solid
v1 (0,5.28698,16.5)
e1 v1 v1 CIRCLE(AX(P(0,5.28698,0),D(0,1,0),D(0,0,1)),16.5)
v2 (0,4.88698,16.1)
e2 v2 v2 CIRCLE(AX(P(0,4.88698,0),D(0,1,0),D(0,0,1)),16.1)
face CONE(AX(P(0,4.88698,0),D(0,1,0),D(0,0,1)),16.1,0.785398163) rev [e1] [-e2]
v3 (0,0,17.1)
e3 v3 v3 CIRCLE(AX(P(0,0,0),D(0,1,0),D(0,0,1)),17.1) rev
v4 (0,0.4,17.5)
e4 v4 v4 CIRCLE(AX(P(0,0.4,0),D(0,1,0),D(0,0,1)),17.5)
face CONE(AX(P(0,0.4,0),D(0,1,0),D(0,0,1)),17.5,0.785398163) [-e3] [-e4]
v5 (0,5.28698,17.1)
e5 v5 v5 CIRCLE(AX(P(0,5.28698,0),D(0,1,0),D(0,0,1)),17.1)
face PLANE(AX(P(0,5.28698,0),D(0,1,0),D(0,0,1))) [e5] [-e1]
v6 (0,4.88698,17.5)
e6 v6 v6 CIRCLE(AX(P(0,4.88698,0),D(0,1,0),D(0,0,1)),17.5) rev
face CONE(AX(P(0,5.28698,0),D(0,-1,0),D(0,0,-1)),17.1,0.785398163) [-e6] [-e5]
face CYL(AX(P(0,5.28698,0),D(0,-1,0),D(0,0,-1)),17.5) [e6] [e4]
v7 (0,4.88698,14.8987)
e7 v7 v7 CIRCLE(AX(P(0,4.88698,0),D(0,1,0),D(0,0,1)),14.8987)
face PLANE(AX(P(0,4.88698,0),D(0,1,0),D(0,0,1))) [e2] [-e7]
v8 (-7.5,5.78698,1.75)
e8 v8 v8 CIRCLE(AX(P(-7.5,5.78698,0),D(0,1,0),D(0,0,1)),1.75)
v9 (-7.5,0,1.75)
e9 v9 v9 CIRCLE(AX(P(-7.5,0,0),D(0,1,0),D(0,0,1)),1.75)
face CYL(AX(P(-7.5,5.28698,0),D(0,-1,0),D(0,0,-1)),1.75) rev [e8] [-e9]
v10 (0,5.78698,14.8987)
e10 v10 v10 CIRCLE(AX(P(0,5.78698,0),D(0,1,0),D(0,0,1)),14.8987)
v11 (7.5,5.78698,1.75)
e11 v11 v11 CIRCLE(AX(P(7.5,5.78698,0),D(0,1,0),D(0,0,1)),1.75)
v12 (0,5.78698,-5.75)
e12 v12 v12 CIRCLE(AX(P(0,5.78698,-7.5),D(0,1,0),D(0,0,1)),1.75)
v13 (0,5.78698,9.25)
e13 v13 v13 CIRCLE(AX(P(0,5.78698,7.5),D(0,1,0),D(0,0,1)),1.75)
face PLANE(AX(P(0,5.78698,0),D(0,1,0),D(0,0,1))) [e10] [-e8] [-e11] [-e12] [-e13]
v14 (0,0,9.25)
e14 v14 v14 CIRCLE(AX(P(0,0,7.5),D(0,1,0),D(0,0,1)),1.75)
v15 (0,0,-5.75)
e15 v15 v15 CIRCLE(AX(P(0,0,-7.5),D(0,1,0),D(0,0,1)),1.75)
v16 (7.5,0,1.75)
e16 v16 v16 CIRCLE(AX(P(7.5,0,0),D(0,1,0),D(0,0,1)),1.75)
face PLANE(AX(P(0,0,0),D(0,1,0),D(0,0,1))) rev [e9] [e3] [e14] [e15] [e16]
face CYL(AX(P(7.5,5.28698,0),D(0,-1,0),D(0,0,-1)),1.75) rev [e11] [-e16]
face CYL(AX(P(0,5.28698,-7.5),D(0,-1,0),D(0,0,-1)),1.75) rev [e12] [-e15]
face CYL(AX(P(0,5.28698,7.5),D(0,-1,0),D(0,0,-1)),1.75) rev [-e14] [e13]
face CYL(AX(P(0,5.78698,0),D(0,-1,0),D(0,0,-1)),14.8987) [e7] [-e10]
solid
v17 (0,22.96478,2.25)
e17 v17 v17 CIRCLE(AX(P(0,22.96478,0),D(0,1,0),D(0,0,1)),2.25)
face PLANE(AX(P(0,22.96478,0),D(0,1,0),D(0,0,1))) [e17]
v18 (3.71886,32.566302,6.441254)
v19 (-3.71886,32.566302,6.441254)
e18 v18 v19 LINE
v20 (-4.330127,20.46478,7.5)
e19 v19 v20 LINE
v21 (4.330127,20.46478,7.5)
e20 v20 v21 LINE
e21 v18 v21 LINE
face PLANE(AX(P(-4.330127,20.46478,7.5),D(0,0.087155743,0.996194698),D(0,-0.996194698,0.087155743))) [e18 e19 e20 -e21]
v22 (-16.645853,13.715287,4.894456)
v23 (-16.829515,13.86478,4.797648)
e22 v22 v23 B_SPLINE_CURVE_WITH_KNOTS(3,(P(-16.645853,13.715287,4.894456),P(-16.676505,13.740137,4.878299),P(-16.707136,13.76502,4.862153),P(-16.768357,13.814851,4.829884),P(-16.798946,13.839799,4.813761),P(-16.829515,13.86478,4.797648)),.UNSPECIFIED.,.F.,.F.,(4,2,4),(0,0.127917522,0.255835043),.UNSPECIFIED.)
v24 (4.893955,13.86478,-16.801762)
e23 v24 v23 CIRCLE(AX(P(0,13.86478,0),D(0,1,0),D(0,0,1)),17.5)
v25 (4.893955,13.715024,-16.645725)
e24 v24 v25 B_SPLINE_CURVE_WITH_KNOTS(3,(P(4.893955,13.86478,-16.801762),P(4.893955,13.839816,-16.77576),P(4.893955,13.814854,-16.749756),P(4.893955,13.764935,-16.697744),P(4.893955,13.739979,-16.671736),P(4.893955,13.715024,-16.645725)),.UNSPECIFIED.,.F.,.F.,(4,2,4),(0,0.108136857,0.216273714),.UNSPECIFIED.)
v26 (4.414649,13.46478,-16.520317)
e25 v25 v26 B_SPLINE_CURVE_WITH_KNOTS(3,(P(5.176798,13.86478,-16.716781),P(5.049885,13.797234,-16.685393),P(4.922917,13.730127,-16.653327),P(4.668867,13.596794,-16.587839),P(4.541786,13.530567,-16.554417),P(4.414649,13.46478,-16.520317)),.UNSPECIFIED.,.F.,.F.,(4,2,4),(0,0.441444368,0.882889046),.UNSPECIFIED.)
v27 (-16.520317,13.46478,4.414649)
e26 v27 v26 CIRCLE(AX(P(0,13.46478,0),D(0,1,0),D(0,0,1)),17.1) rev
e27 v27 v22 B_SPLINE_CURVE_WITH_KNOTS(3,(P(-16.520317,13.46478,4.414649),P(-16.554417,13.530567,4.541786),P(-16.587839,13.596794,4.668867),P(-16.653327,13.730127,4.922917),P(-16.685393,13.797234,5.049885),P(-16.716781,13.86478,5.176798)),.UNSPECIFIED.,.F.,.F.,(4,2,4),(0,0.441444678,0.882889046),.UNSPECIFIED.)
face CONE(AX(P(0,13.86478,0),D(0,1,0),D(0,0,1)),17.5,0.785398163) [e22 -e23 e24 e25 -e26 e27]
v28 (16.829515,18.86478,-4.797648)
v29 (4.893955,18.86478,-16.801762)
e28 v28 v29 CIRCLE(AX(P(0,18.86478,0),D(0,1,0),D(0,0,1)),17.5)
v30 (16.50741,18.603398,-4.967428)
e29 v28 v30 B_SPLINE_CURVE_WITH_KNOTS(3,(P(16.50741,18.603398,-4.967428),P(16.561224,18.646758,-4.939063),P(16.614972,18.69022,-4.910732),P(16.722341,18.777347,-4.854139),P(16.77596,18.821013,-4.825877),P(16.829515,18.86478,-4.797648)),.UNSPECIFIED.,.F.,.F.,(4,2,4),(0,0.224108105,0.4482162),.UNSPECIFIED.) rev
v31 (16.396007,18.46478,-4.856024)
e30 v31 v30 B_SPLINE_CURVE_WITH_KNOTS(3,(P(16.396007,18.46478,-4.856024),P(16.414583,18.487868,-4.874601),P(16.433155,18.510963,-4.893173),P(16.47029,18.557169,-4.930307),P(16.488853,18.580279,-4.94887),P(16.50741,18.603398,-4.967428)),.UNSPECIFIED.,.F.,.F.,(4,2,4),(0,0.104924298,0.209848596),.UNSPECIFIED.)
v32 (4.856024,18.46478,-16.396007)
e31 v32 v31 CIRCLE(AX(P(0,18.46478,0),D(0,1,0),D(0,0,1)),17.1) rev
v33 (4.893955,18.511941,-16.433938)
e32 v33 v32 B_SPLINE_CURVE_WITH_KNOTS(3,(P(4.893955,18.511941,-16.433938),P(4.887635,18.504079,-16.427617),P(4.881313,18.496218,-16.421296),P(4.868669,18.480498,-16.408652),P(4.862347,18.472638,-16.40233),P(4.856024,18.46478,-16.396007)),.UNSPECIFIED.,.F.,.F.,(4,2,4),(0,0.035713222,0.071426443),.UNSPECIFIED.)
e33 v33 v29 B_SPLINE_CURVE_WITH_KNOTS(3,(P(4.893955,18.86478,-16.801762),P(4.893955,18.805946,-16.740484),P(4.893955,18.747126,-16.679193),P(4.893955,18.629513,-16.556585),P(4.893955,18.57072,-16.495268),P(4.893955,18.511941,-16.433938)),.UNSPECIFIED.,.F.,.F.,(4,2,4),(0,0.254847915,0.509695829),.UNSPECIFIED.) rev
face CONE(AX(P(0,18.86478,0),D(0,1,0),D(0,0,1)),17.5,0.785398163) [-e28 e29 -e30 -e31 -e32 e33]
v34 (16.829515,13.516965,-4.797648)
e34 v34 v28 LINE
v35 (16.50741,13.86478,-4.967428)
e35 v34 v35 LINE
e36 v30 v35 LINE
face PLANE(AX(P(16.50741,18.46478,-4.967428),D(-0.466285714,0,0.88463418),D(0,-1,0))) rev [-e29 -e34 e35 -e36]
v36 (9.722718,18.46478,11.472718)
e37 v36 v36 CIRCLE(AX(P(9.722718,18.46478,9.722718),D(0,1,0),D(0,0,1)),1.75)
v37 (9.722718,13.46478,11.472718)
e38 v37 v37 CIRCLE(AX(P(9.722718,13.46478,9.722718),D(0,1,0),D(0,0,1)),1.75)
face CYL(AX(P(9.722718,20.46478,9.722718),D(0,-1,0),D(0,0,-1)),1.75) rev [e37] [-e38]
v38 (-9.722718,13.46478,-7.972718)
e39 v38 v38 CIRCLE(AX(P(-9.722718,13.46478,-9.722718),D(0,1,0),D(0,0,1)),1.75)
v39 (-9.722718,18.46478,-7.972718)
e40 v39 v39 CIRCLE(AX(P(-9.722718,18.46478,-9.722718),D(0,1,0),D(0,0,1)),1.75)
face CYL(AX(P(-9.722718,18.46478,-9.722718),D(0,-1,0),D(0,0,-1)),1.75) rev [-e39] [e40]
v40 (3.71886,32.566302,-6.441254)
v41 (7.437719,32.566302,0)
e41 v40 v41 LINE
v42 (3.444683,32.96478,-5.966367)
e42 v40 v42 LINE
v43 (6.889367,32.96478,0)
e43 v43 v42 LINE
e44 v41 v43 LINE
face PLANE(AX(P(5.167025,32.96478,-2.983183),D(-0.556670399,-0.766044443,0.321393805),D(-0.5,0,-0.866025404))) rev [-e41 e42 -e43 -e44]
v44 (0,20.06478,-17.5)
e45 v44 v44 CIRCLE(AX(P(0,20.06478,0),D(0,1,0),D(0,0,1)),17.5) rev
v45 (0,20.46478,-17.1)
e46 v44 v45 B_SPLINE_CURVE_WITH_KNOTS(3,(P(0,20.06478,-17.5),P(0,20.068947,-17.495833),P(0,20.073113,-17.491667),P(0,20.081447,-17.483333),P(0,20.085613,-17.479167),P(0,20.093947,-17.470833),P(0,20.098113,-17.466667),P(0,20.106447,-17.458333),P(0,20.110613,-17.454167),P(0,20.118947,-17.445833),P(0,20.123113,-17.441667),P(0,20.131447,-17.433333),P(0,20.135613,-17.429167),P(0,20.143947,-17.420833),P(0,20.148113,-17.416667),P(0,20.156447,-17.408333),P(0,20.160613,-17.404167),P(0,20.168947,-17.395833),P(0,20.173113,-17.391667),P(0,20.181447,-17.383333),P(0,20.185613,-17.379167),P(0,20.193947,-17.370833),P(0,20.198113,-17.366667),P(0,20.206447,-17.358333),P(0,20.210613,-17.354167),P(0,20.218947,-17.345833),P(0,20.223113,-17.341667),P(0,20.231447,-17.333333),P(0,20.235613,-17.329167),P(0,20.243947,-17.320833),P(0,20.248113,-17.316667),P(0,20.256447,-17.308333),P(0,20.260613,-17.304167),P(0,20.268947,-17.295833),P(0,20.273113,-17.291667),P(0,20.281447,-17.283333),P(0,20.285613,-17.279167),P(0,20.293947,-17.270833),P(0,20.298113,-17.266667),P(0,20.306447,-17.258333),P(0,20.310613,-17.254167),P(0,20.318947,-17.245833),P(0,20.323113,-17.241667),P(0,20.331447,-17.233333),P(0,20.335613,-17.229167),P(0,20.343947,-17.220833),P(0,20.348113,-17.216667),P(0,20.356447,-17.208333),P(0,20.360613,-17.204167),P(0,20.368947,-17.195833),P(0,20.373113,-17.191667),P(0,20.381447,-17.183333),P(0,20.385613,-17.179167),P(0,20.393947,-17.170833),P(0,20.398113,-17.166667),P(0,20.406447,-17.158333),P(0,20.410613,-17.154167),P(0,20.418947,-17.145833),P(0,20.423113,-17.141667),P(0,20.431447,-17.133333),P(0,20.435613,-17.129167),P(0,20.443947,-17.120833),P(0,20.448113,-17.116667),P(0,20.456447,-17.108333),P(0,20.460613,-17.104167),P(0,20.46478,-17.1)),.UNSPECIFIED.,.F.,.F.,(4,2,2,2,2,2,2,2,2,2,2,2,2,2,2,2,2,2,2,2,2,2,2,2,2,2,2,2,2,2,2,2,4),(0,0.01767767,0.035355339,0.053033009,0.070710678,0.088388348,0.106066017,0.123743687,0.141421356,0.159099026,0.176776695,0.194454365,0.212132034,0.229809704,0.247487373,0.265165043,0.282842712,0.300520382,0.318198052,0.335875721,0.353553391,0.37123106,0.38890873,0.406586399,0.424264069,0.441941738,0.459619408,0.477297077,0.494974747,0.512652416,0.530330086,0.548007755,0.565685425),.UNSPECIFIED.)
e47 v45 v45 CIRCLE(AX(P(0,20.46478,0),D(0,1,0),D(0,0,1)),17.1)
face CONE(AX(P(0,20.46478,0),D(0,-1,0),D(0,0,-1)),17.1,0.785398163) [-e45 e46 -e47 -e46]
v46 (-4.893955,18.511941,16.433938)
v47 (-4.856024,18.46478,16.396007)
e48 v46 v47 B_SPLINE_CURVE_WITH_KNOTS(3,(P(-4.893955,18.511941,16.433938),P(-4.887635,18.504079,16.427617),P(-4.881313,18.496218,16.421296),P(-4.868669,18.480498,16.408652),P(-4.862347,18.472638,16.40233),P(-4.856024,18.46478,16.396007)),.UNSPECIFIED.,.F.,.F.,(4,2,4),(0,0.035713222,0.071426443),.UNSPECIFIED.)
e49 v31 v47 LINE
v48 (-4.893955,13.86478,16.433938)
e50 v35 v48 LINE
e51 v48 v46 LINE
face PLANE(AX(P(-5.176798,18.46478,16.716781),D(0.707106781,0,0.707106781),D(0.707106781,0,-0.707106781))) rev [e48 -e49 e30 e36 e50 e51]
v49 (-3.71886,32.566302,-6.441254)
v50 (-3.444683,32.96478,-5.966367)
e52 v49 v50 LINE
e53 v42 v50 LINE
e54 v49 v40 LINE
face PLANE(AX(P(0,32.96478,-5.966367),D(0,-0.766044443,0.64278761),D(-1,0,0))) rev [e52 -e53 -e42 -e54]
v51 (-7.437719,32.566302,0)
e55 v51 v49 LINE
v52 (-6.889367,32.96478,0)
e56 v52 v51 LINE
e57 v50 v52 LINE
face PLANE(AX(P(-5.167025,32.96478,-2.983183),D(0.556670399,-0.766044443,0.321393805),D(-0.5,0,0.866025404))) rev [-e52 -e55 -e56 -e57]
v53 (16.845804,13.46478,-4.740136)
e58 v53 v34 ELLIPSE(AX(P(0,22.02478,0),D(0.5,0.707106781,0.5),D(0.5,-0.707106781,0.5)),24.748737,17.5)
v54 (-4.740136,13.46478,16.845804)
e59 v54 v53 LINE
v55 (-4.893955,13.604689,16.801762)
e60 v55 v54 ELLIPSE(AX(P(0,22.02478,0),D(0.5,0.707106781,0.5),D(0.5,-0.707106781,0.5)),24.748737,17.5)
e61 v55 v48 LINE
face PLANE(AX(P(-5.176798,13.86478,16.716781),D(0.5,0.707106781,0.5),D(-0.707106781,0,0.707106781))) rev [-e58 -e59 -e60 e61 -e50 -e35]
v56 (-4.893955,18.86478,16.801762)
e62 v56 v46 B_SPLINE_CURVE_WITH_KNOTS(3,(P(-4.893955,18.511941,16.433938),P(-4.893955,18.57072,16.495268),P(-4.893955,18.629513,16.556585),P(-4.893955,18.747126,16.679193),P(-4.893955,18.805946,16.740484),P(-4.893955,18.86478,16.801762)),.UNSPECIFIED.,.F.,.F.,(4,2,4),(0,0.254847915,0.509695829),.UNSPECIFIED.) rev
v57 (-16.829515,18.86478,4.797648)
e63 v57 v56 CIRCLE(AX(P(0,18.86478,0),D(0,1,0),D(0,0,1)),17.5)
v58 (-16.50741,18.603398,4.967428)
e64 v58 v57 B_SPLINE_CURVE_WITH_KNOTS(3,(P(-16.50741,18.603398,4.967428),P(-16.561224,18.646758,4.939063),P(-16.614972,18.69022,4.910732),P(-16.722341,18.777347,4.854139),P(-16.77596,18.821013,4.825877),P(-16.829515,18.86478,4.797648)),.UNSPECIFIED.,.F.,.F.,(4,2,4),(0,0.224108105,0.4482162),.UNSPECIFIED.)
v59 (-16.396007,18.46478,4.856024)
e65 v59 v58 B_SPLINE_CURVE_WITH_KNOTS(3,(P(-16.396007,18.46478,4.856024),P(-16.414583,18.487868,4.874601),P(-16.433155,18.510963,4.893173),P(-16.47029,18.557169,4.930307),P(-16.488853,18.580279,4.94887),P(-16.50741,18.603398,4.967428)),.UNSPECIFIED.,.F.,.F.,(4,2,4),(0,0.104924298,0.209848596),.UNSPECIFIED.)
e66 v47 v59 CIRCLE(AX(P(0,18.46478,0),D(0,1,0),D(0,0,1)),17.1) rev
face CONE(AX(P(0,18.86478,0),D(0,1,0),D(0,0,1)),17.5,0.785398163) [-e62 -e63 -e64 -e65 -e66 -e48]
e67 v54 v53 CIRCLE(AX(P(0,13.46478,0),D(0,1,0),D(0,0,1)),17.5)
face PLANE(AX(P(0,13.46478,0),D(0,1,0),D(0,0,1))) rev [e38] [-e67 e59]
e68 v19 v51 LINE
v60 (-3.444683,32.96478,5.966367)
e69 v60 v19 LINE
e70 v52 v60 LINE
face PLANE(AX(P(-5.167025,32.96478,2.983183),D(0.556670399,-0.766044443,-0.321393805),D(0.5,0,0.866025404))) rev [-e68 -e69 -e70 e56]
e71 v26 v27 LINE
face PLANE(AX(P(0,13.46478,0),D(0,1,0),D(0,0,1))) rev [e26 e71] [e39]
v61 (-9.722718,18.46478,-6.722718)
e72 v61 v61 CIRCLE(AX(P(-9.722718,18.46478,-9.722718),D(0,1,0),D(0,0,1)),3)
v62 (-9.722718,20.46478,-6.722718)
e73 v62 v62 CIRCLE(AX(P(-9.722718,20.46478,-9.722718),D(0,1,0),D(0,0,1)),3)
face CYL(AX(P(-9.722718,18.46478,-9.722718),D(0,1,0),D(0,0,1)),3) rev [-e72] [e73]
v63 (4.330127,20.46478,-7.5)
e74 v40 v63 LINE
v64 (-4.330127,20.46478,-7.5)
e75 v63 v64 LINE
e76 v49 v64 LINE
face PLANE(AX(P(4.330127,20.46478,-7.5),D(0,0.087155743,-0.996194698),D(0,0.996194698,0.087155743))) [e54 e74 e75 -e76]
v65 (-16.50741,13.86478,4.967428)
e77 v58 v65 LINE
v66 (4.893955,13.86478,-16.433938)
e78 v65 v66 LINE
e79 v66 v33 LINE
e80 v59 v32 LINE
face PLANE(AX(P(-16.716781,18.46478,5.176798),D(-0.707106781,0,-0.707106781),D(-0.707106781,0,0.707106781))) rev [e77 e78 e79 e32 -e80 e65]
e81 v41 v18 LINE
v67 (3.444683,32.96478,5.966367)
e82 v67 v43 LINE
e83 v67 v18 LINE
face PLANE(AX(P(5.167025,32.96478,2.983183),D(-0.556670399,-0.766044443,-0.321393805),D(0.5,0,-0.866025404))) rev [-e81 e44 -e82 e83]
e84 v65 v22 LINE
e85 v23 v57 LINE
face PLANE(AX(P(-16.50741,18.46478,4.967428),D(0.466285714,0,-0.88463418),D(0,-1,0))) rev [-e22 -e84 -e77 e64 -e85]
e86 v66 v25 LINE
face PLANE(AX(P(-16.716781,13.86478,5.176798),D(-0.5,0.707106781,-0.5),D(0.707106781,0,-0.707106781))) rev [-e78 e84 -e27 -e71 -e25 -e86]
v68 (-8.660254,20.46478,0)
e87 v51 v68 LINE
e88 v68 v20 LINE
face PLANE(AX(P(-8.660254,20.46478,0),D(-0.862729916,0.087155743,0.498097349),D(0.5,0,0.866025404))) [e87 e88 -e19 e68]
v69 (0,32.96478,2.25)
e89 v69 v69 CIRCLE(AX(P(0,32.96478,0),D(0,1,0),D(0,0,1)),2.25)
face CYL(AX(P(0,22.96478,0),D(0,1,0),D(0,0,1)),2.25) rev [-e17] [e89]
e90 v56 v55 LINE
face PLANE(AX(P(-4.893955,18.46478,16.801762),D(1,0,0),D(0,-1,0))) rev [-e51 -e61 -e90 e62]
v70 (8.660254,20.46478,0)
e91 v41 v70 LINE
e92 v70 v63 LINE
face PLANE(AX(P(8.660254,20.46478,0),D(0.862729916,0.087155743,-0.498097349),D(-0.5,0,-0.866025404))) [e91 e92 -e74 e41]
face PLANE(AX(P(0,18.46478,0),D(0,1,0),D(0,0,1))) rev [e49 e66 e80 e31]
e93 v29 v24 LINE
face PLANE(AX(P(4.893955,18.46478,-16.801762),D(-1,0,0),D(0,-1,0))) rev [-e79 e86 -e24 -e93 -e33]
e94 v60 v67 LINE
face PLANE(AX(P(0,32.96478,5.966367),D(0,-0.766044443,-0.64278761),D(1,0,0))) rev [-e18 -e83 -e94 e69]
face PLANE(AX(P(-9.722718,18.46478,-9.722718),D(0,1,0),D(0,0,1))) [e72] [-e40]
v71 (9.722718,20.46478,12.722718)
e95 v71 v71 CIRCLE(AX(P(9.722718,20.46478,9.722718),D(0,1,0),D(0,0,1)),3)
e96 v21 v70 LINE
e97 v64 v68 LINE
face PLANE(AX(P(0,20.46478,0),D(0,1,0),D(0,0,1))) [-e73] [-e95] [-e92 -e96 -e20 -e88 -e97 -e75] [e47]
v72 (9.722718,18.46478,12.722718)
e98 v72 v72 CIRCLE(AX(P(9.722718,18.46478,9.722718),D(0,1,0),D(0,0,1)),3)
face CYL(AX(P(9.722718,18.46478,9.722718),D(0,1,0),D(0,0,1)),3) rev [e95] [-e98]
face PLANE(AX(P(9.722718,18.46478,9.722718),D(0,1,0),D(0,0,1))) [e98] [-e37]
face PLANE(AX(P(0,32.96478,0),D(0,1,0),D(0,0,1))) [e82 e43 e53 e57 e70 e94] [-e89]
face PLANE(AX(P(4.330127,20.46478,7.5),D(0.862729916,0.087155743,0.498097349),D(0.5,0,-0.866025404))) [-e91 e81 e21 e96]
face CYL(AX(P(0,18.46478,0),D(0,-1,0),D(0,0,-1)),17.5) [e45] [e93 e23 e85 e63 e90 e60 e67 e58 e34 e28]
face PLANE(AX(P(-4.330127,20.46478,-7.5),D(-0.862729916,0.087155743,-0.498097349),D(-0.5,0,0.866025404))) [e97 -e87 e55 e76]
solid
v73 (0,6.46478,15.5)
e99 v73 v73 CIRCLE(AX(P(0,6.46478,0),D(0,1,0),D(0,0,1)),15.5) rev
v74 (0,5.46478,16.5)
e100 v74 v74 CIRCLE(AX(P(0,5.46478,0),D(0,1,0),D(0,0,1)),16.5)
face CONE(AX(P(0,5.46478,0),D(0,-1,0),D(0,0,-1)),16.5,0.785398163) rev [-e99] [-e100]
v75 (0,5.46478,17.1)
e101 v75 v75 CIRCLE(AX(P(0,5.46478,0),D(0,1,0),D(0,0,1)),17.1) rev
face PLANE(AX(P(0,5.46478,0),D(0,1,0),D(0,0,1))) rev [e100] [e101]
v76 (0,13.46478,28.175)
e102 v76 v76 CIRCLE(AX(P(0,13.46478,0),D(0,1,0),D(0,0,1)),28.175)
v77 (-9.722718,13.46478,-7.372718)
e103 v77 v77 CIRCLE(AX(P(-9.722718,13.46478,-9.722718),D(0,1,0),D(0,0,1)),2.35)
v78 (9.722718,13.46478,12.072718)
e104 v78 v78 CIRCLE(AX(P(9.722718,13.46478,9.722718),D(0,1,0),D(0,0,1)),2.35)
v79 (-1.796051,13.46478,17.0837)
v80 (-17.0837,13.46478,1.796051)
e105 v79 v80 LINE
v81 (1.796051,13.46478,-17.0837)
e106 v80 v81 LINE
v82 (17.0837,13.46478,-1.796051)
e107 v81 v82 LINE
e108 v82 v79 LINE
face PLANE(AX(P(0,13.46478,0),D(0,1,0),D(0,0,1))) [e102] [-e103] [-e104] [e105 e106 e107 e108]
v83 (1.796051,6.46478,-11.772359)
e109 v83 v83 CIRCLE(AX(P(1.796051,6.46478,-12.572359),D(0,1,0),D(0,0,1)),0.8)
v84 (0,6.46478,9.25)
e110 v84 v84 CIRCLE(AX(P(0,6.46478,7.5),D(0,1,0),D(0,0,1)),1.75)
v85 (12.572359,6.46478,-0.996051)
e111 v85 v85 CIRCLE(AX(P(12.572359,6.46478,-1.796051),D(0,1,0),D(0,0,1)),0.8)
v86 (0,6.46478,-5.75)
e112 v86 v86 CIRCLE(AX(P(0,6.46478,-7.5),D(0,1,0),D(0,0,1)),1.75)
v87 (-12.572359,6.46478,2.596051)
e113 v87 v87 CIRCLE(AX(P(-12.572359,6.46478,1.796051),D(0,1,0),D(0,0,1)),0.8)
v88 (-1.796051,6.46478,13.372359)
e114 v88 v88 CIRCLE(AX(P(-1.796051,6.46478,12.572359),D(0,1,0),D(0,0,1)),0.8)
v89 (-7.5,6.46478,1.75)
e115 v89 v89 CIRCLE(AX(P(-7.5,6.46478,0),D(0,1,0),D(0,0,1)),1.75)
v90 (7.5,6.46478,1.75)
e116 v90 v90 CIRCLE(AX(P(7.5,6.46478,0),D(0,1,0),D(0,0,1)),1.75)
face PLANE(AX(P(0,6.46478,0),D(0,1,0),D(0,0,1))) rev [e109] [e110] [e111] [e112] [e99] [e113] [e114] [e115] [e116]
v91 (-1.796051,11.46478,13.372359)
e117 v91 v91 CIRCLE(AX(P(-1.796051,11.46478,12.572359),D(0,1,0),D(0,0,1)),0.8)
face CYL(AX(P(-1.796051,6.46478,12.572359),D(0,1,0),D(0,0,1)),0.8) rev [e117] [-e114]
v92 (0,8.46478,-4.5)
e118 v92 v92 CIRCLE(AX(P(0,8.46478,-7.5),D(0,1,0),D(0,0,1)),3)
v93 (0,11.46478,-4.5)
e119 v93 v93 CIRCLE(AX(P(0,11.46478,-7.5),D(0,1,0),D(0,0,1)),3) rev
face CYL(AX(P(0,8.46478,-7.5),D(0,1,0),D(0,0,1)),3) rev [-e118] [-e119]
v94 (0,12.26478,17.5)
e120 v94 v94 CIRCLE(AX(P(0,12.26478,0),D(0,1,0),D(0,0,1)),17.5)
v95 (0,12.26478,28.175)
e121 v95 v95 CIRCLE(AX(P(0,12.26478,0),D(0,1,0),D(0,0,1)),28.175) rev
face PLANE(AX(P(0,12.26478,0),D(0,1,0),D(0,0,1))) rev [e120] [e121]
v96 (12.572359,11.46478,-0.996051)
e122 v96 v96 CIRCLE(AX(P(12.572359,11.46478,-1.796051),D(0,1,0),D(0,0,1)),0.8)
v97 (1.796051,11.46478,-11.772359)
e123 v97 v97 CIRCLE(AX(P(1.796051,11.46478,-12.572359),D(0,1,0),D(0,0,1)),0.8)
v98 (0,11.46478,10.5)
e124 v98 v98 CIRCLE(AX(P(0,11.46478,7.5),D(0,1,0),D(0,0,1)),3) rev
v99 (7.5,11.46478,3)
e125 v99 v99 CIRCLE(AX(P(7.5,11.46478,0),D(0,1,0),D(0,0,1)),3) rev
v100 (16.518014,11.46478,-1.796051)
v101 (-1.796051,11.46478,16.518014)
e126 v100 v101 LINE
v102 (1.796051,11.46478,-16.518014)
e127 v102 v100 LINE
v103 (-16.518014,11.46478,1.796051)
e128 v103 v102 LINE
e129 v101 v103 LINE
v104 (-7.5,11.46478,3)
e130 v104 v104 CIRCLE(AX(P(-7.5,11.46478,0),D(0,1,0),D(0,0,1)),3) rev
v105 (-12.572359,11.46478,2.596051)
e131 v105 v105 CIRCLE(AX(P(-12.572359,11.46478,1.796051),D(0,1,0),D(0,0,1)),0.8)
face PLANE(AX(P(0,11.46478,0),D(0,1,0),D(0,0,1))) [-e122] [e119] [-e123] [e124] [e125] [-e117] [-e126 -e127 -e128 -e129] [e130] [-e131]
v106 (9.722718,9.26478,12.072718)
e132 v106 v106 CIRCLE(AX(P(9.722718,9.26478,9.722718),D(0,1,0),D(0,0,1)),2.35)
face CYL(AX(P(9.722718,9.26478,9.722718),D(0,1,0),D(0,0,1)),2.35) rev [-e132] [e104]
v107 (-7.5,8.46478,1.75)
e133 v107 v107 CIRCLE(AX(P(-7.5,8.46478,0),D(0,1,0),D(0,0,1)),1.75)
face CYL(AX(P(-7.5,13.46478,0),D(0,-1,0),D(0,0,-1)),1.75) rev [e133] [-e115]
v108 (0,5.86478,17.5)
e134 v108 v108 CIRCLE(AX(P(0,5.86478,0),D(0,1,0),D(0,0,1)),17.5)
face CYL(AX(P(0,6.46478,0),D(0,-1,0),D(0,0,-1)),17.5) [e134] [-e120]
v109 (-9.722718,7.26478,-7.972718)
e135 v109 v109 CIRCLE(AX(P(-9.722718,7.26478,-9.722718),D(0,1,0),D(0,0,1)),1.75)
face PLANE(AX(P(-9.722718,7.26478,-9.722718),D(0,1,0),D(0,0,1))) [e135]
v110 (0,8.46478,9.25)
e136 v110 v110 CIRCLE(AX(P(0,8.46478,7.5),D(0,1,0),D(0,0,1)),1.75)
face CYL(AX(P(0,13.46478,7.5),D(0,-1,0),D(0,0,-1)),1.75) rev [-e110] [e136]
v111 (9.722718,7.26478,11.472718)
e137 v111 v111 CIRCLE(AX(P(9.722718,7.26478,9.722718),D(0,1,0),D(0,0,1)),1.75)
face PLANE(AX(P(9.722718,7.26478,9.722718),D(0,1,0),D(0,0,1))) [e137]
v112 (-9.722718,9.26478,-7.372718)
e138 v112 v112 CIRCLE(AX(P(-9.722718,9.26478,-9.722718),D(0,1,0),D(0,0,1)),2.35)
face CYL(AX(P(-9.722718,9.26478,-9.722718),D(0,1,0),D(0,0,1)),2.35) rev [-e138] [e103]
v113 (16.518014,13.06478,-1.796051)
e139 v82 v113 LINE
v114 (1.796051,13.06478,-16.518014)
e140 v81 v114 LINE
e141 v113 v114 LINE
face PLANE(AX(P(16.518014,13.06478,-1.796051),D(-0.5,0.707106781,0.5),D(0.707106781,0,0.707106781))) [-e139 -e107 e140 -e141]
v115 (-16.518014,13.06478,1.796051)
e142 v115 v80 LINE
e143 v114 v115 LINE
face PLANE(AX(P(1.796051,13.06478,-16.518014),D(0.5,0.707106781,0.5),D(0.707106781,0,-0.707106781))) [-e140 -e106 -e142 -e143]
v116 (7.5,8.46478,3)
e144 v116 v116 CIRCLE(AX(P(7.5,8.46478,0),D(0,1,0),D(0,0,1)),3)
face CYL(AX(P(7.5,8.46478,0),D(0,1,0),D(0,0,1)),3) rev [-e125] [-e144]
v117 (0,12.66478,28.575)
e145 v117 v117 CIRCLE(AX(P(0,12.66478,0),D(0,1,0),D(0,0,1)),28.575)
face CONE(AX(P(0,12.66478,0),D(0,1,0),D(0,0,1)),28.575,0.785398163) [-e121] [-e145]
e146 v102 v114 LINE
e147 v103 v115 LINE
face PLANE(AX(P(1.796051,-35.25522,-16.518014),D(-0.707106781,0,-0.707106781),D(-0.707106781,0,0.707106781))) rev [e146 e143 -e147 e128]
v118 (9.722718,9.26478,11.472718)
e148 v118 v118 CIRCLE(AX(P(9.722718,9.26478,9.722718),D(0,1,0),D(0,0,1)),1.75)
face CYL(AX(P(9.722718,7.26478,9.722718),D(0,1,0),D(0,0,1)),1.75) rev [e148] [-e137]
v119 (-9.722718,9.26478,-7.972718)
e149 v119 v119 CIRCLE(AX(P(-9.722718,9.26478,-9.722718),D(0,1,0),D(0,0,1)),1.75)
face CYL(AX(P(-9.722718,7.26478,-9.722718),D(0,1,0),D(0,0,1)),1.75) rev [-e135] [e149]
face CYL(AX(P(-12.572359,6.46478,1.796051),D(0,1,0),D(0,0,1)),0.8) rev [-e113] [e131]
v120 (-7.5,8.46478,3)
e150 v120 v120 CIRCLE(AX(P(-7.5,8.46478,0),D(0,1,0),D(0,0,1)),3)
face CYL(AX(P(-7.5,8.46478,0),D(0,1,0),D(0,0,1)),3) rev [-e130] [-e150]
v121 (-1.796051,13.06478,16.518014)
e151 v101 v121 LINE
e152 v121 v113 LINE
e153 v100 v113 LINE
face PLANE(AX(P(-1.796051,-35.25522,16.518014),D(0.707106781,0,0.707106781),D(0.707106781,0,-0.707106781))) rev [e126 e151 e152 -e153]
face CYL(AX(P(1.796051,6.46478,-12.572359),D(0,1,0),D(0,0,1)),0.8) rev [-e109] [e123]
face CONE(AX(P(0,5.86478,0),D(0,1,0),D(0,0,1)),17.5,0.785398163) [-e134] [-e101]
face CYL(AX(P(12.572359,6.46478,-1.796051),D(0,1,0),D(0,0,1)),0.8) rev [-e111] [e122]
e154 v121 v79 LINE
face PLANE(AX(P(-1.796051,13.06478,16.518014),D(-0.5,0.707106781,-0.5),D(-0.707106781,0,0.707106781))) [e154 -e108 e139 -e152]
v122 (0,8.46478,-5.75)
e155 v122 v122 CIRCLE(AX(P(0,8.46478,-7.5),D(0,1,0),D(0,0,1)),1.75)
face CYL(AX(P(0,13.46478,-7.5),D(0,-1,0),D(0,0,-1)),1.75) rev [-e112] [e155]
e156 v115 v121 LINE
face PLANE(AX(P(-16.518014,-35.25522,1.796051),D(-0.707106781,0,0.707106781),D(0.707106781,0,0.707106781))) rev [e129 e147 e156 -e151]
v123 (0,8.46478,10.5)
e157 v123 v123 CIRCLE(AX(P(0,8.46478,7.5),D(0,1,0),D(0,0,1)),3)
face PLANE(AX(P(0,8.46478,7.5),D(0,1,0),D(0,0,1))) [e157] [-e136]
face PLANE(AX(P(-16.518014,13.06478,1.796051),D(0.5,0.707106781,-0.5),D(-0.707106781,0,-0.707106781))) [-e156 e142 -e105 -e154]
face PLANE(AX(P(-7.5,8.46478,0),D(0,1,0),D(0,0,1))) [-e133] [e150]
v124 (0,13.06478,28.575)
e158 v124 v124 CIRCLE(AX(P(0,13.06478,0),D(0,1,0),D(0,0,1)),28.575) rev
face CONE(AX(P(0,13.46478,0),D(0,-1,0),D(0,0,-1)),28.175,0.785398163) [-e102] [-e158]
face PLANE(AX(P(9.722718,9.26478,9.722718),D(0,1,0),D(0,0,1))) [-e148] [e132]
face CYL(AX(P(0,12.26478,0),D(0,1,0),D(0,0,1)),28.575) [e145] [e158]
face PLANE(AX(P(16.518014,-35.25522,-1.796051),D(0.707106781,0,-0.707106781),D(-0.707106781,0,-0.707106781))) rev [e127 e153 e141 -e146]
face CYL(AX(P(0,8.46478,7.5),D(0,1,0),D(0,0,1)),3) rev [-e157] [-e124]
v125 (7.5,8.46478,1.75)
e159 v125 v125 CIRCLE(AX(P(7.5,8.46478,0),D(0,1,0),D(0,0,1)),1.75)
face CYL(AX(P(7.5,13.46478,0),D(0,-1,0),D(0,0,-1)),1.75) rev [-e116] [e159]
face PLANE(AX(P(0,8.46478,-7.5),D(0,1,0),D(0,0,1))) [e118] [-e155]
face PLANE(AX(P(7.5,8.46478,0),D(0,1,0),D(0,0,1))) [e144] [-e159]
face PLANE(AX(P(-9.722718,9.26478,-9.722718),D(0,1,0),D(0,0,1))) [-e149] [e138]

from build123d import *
from OCP.BRepFilletAPI import BRepFilletAPI_MakeChamfer

# Parameters (mm, degrees)
SKETCH1_R                                      = 17.5
SKETCH1_R_2                                    = 1.75
MAIN_BOSS_DEPTH                                = 5.28698
SKETCH3_R                                      = 14.8987
SKETCH3_R_2                                    = 1.75
CODEWHEEL_CENTER_BOSS_DEPTH                    = 0.5
CODEWHEEL_START                                = -0.4
SKETCH4_R                                      = 16.5
SKETCH4_R_2                                    = 14.8987
CODEWHEEL_RELIEF_CUT_DEPTH                     = 0.4
CODEWHEEL_RELIEF_CHAMFER_SIZE                  = 0.4
SKETCH6_R                                      = 17.5
SKETCH6_R_2                                    = 16.5
CODEWHEEL_TOP_BOSS_DEPTH                       = 1
SKETCH7_R                                      = 17.5
SKETCH7_R_2                                    = 1.75
SECONDARY_BOSS_DEPTH                           = 7
CODEWHEEL_RELIEF_CHAMFER_2_SIZE                = 1
SKETCH8_R                                      = 3
MOTOR_BOLT_COUNTERSINKS_DEPTH                  = 5
EDGE_CHAMFERS_1_SIZE                           = 0.4
EDGE_CHAMFERS_2_SIZE                           = 0.4
ACCELEROMETER_NOTCH_DEPTH                      = 2
SKETCH13_R                                     = 2.35
ACCELEROMETER_LAYER_HEAT_SET_INSERT_HOLE_DEPTH = 4.2
SKETCH14_R                                     = 1.75
ACCELEROMETER_LAYER_BOLT_THROUGH_HOLES_DEPTH   = 2
SKETCH15_R                                     = 1.75
ACCELEROMETER_COVER_DEPTH                      = 5
ACCELEROMETER_COVER_2_DEPTH                    = 5
SKETCH17_R                                     = 17.5
SKETCH17_R_2                                   = 1.75
ACCELEROMETER_COVER_BOSS_DEPTH                 = 2
SKETCH19_R                                     = 3
ACCLEROMETER_COVER_COUNTERSINKS_DEPTH          = 2
EDGE_CHAMFERS_3_SIZE                           = 0.4
OUTPUT_CONE_DEPTH                              = 12.5
OUTPUT_CONE_TAPER                              = 5
CHAMFER1_SIZE                                  = 0.4
CHAMFER1_SIZE2                                 = 0.440025147
SKETCH20_R                                     = 2.25
CUT_EXTRUDE1_DEPTH                             = 10
SKETCH21_R                                     = 0.8
CUT_EXTRUDE2_DEPTH                             = 5
CUT_EXTRUDE3_DEPTH                             = 2
SKETCH23_R                                     = 28.575
SKETCH23_R_2                                   = 17.1
BOSS_EXTRUDE1_DEPTH                            = 1.2
CHAMFER2_SIZE                                  = 0.4
CHAMFER3_SIZE                                  = 0.4
CHAMFER3_SIZE_2                                = 0.296094537


# Some blends are built 0.0001 mm under size
with BuildPart() as part:
    # Sketch1 → Main Boss (new body)
    with BuildSketch(Plane(origin=(0, 0, 0), x_dir=(1, 0, 0), z_dir=(0, 1, 0))):
        with Locations(Location((0, 0, 0), (0, 0, 270))):
            Circle(SKETCH1_R)
        with Locations(Location((7.5, 0, 0), (0, 0, 270))):
            Circle(SKETCH1_R_2, mode=Mode.SUBTRACT)
        with Locations(Location((0, 7.5, 0), (0, 0, 270))):
            Circle(SKETCH1_R_2, mode=Mode.SUBTRACT)
        with Locations(Location((-7.5, 0, 0), (0, 0, 270))):
            Circle(SKETCH1_R_2, mode=Mode.SUBTRACT)
        with Locations(Location((0, -7.5, 0), (0, 0, 270))):
            Circle(SKETCH1_R_2, mode=Mode.SUBTRACT)
    extrude(amount=MAIN_BOSS_DEPTH)

    # Sketch3 → Codewheel Center Boss (add)
    with BuildSketch(Plane(origin=(0, 5.28698, 0), x_dir=(1, 0, 0), z_dir=(0, 1, 0))):
        with Locations(Location((0, 0, 0), (0, 0, 270))):
            Circle(SKETCH3_R)
        with Locations(Location((-7.5, 0, 0), (0, 0, 270))):
            Circle(SKETCH3_R_2, mode=Mode.SUBTRACT)
        with Locations(Location((0, -7.5, 0), (0, 0, 270))):
            Circle(SKETCH3_R_2, mode=Mode.SUBTRACT)
        with Locations(Location((7.5, 0, 0), (0, 0, 270))):
            Circle(SKETCH3_R_2, mode=Mode.SUBTRACT)
        with Locations(Location((0, 7.5, 0), (0, 0, 270))):
            Circle(SKETCH3_R_2, mode=Mode.SUBTRACT)
    extrude(amount=CODEWHEEL_CENTER_BOSS_DEPTH)

    # Sketch4 → Codewheel Relief Cut (cut)
    with BuildSketch(Plane(origin=(0, 5.28698, 0), x_dir=(1, 0, 0), z_dir=(0, 1, 0)).offset(CODEWHEEL_START)):
        with Locations(Location((0, 0, 0), (0, 0, 270))):
            Circle(SKETCH4_R)
        with Locations(Location((0, 0, 0), (0, 0, 270))):
            Circle(SKETCH4_R_2, mode=Mode.SUBTRACT)
    extrude(amount=CODEWHEEL_RELIEF_CUT_DEPTH, mode=Mode.SUBTRACT)

    # Codewheel Relief Chamfer
    codewheel_relief_chamfer_edges = [part.edges().sort_by_distance(p)[0] for p in [
        (0, 4.88698, -16.5),
    ]]
    chamfer(codewheel_relief_chamfer_edges, length=CODEWHEEL_RELIEF_CHAMFER_SIZE - 0.0001)  # a hair under: the kernel refuses the full size

    # Edge Chamfers 1
    edge_chamfers_1_edges = [part.edges().sort_by_distance(p)[0] for p in [
        (0, 0, -17.5),
        (0, 5.28698, -17.5),
    ]]
    chamfer(edge_chamfers_1_edges, length=EDGE_CHAMFERS_1_SIZE)


with BuildPart() as body_2:
    # Sketch6 → Codewheel Top Boss (new body)
    with BuildSketch(Plane(origin=(0, 5.46478, 0), x_dir=(1, 0, 0), z_dir=(0, 1, 0))):
        with Locations(Location((0, 0, 0), (0, 0, 270))):
            Circle(SKETCH6_R)
        with Locations(Location((0, 0, 0), (0, 0, 270))):
            Circle(SKETCH6_R_2, mode=Mode.SUBTRACT)
    extrude(amount=CODEWHEEL_TOP_BOSS_DEPTH)

    # Sketch7 → Secondary Boss (add)
    with BuildSketch(Plane(origin=(0, 6.46478, 0), x_dir=(1, 0, 0), z_dir=(0, 1, 0))):
        with Locations(Location((0, 0, 0), (0, 0, 270))):
            Circle(SKETCH7_R)
        with Locations(Location((0, -7.5, 0), (0, 0, 270))):
            Circle(SKETCH7_R_2, mode=Mode.SUBTRACT)
        with Locations(Location((7.5, 0, 0), (0, 0, 270))):
            Circle(SKETCH7_R_2, mode=Mode.SUBTRACT)
        with Locations(Location((-7.5, 0, 0), (0, 0, 270))):
            Circle(SKETCH7_R_2, mode=Mode.SUBTRACT)
        with Locations(Location((0, 7.5, 0), (0, 0, 270))):
            Circle(SKETCH7_R_2, mode=Mode.SUBTRACT)
    extrude(amount=SECONDARY_BOSS_DEPTH)

    # Codewheel Relief Chamfer 2
    codewheel_relief_chamfer_2_edges = [body_2.edges().sort_by_distance(p)[0] for p in [
        (0, 6.46478, -16.5),
    ]]
    chamfer(codewheel_relief_chamfer_2_edges, length=CODEWHEEL_RELIEF_CHAMFER_2_SIZE - 0.0001)  # a hair under: the kernel refuses the full size

    # Sketch8 → Motor Bolt Countersinks (cut)
    with BuildSketch(Plane(origin=(0, 13.46478, 0), x_dir=(1, 0, 0), z_dir=(0, 1, 0))):
        with Locations(Location((-7.5, 0, 0), (0, 0, 270))):
            Circle(SKETCH8_R)
        with Locations(Location((0, 7.5, 0), (0, 0, 270))):
            Circle(SKETCH8_R)
        with Locations(Location((7.5, 0, 0), (0, 0, 270))):
            Circle(SKETCH8_R)
        with Locations(Location((0, -7.5, 0), (0, 0, 270))):
            Circle(SKETCH8_R)
    extrude(amount=-MOTOR_BOLT_COUNTERSINKS_DEPTH, mode=Mode.SUBTRACT)

    # Edge Chamfers 2
    edge_chamfers_2_edges = [body_2.edges().sort_by_distance(p)[0] for p in [
        (0, 13.46478, -17.5),
        (0, 5.46478, -17.5),
    ]]
    chamfer(edge_chamfers_2_edges, length=EDGE_CHAMFERS_2_SIZE)

    # Sketch11 → Accelerometer Notch (cut)
    with BuildSketch(Plane(origin=(0, 13.46478, 0), x_dir=(1, 0, 0), z_dir=(0, 1, 0))):
        Polygon((-16.164461018, -1.796051224), (1.796051224, 16.164461018), (16.164461018, 1.796051224), (-1.796051224, -16.164461018), align=None)
    extrude(amount=-ACCELEROMETER_NOTCH_DEPTH, mode=Mode.SUBTRACT)

    # Sketch13 → Accelerometer Layer Heat Set Insert Holes (cut)
    with BuildSketch(Plane(origin=(0, 13.46478, 0), x_dir=(1, 0, 0), z_dir=(0, 1, 0))):
        with Locations(Location((-9.722718241, 9.722718241, 0), (0, 0, 270))):
            Circle(SKETCH13_R)
        with Locations(Location((9.722718241, -9.722718241, 0), (0, 0, 270))):
            Circle(SKETCH13_R)
    extrude(amount=-ACCELEROMETER_LAYER_HEAT_SET_INSERT_HOLE_DEPTH, mode=Mode.SUBTRACT)

    # Sketch14 → Accelerometer Layer Bolt Through Holes (cut)
    with BuildSketch(Plane(origin=(0, 9.26478, 0), x_dir=(1, 0, 0), z_dir=(0, 1, 0))):
        with Locations(Location((-9.722718241, 9.722718241, 0), (0, 0, 270))):
            Circle(SKETCH14_R)
        with Locations(Location((9.722718241, -9.722718241, 0), (0, 0, 270))):
            Circle(SKETCH14_R)
    extrude(amount=-ACCELEROMETER_LAYER_BOLT_THROUGH_HOLES_DEPTH, mode=Mode.SUBTRACT)

    # Sketch21 → Cut-Extrude2 (cut)
    with BuildSketch(Plane(origin=(0, 11.46478, 0), x_dir=(1, 0, 0), z_dir=(0, 1, 0))):
        with Locations(Location((1.796051224, 12.572358569, 0), (0, 0, 270))):
            Circle(SKETCH21_R)
        with Locations(Location((-12.572358569, -1.796051224, 0), (0, 0, 270))):
            Circle(SKETCH21_R)
        with Locations(Location((-1.796051224, -12.572358569, 0), (0, 0, 270))):
            Circle(SKETCH21_R)
        with Locations(Location((12.572358569, 1.796051224, 0), (0, 0, 270))):
            Circle(SKETCH21_R)
    extrude(amount=-CUT_EXTRUDE2_DEPTH, mode=Mode.SUBTRACT)

    # Sketch22 → Cut-Extrude3 (cut)
    with BuildSketch(Plane(origin=(0, 13.46478, 0), x_dir=(1, 0, 0), z_dir=(0, 1, 0))):
        Polygon((-1.796051224, -16.518014409), (16.518014409, 1.796051224), (1.796051224, 16.518014409), (-16.518014409, -1.796051224), align=None)
    extrude(amount=-CUT_EXTRUDE3_DEPTH, mode=Mode.SUBTRACT)

    # Sketch23 → Boss-Extrude1 (add)
    with BuildSketch(Plane(origin=(0, 13.46478, 0), x_dir=(1, 0, 0), z_dir=(0, 1, 0))):
        with Locations(Location((0, 0, 0), (0, 0, 270))):
            Circle(SKETCH23_R)
        Circle(SKETCH23_R_2, mode=Mode.SUBTRACT)
    extrude(amount=-BOSS_EXTRUDE1_DEPTH)

    # Chamfer2
    chamfer2_edges = [body_2.edges().sort_by_distance(p)[0] for p in [
        (-9.157032816, 13.46478, 9.157032816),
        (7.360981592, 13.46478, 7.360981592),
        (9.157032816, 13.46478, -9.157032816),
        (-7.360981592, 13.46478, -7.360981592),
        (0, 12.26478, -28.575),
        (0, 13.46478, -28.575),
    ]]
    chamfer(chamfer2_edges, length=CHAMFER2_SIZE)


with BuildPart() as body_3:
    # Sketch15 → Accelerometer Cover (new body)
    with BuildSketch(Plane(origin=(0, 13.46478, 0), x_dir=(1, 0, 0), z_dir=(0, 1, 0))):
        with BuildLine():
            Line((-16.716780818, -5.176798149), (5.176798149, 16.716780818))
            ThreePointArc((5.176798149, 16.716780818), (-12.374368671, 12.374368671), (-16.716780818, -5.176798149))
        make_face()
        with Locations(Location((-9.722718241, 9.722718241, 0), (0, 0, 270))):
            Circle(SKETCH15_R, mode=Mode.SUBTRACT)
    extrude(amount=ACCELEROMETER_COVER_DEPTH)



with BuildPart() as body_4:
    # Sketch15 → Accelerometer Cover 2 (new body)
    with BuildSketch(Plane(origin=(0, 13.46478, 0), x_dir=(1, 0, 0), z_dir=(0, 1, 0))):
        with BuildLine():
            Line((-5.176798149, -16.716780818), (16.716780818, 5.176798149))
            ThreePointArc((16.716780818, 5.176798149), (12.374368671, -12.374368671), (-5.176798149, -16.716780818))
        make_face()
        with Locations(Location((9.722718241, -9.722718241, 0), (0, 0, 270))):
            Circle(SKETCH15_R, mode=Mode.SUBTRACT)
    extrude(amount=ACCELEROMETER_COVER_2_DEPTH)


with BuildPart() as body_3_1:
    add(body_3.part)

    add(body_4.part)  # Accelerometer Cover Boss merges body 4
    # Sketch17 → Accelerometer Cover Boss (add)
    with BuildSketch(Plane(origin=(0, 18.46478, 0), x_dir=(1, 0, 0), z_dir=(0, 1, 0))):
        with Locations(Location((0, 0, 0), (0, 0, 72.793463048))):
            Circle(SKETCH17_R)
        with Locations(Location((9.722718241, -9.722718241, 0), (0, 0, 270))):
            Circle(SKETCH17_R_2, mode=Mode.SUBTRACT)
        with Locations(Location((-9.722718241, 9.722718241, 0), (0, 0, 270))):
            Circle(SKETCH17_R_2, mode=Mode.SUBTRACT)
    extrude(amount=ACCELEROMETER_COVER_BOSS_DEPTH)

    # Sketch19 → Acclerometer Cover Countersinks (cut)
    with BuildSketch(Plane(origin=(0, 20.46478, 0), x_dir=(1, 0, 0), z_dir=(0, 1, 0))):
        with Locations(Location((-9.722718241, 9.722718241, 0), (0, 0, 270))):
            Circle(SKETCH19_R)
        with Locations(Location((9.722718241, -9.722718241, 0), (0, 0, 270))):
            Circle(SKETCH19_R)
    extrude(amount=-ACCLEROMETER_COVER_COUNTERSINKS_DEPTH, mode=Mode.SUBTRACT)

    # Edge Chamfers 3
    edge_chamfers_3_edges = [body_3_1.edges().sort_by_distance(p)[0] for p in [
        (-5.176798149, 20.46478, 16.716780818),
        (-12.374368671, 13.46478, -12.374368671),
    ]]
    chamfer(edge_chamfers_3_edges, length=EDGE_CHAMFERS_3_SIZE)

    # Sketch18 → Output Cone (add)
    with BuildSketch(Plane(origin=(0, 20.46478, 0), x_dir=(1, 0, 0), z_dir=(0, 1, 0))):
        Polygon((4.330127019, 7.5), (-4.330127019, 7.5), (-8.660254038, 0), (-4.330127019, -7.5), (4.330127019, -7.5), (8.660254038, 0), align=None)
    extrude(amount=OUTPUT_CONE_DEPTH, taper=OUTPUT_CONE_TAPER)

    # Chamfer1: one chamfer whose edges measure the first distance from different faces: ONE call of the kernel's chamfer builder (chamfer() names one face for all edges)
    chamfer1_edges_1 = [body_3_1.edges().sort_by_distance(p)[0] for p in [
        (5.548097964, 32.96478, -3.203195853),
    ]]
    chamfer1_side_1 = [body_3_1.faces().sort_by_distance(p)[0] for p in [
        (6.034057582, 26.550945221, -3.483764769),
    ]]
    chamfer1_edges_2 = [body_3_1.edges().sort_by_distance(p)[0] for p in [
        (0, 32.96478, -6.406391706),
    ]]
    chamfer1_side_2 = [body_3_1.faces().sort_by_distance(p)[0] for p in [
        (0, 26.550945221, -6.967529539),
    ]]
    chamfer1_edges_3 = [body_3_1.edges().sort_by_distance(p)[0] for p in [
        (-5.548097964, 32.96478, -3.203195853),
    ]]
    chamfer1_side_3 = [body_3_1.faces().sort_by_distance(p)[0] for p in [
        (-6.034057582, 26.550945221, -3.483764769),
    ]]
    chamfer1_edges_4 = [body_3_1.edges().sort_by_distance(p)[0] for p in [
        (-5.548097964, 32.96478, 3.203195853),
    ]]
    chamfer1_side_4 = [body_3_1.faces().sort_by_distance(p)[0] for p in [
        (-6.034057582, 26.550945221, 3.483764769),
    ]]
    chamfer1_edges_5 = [body_3_1.edges().sort_by_distance(p)[0] for p in [
        (0, 32.96478, 6.406391706),
    ]]
    chamfer1_side_5 = [body_3_1.faces().sort_by_distance(p)[0] for p in [
        (0, 26.550945221, 6.967529539),
    ]]
    chamfer1_edges_6 = [body_3_1.edges().sort_by_distance(p)[0] for p in [
        (5.548097964, 32.96478, 3.203195853),
    ]]
    chamfer1_side_6 = [body_3_1.faces().sort_by_distance(p)[0] for p in [
        (6.034057582, 26.550945221, 3.483764769),
    ]]
    chamfer1 = BRepFilletAPI_MakeChamfer(body_3_1.part.solid().wrapped)
    for e in chamfer1_edges_1:
        chamfer1.Add(CHAMFER1_SIZE, CHAMFER1_SIZE2, e.wrapped, chamfer1_side_1[0].wrapped)  # the first distance lies on this face
    for e in chamfer1_edges_2:
        chamfer1.Add(CHAMFER1_SIZE, CHAMFER1_SIZE2, e.wrapped, chamfer1_side_2[0].wrapped)  # the first distance lies on this face
    for e in chamfer1_edges_3:
        chamfer1.Add(CHAMFER1_SIZE, CHAMFER1_SIZE2, e.wrapped, chamfer1_side_3[0].wrapped)  # the first distance lies on this face
    for e in chamfer1_edges_4:
        chamfer1.Add(CHAMFER1_SIZE, CHAMFER1_SIZE2, e.wrapped, chamfer1_side_4[0].wrapped)  # the first distance lies on this face
    for e in chamfer1_edges_5:
        chamfer1.Add(CHAMFER1_SIZE, CHAMFER1_SIZE2, e.wrapped, chamfer1_side_5[0].wrapped)  # the first distance lies on this face
    for e in chamfer1_edges_6:
        chamfer1.Add(CHAMFER1_SIZE, CHAMFER1_SIZE2, e.wrapped, chamfer1_side_6[0].wrapped)  # the first distance lies on this face
    add(Compound.cast(chamfer1.Shape()), mode=Mode.REPLACE)

    # Sketch20 → Cut-Extrude1 (cut)
    with BuildSketch(Plane(origin=(0, 32.96478, 0), x_dir=(1, 0, 0), z_dir=(0, 1, 0))):
        with Locations(Location((0, 0, 0), (0, 0, 270))):
            Circle(SKETCH20_R)
    extrude(amount=-CUT_EXTRUDE1_DEPTH, mode=Mode.SUBTRACT)

    # Chamfer3
    # the kernel refuses this chamfer: 0.4, 0.296094537 mm, written as the material it takes off along each edge
    with BuildSketch(Plane(origin=(0, 18.46478, 0), x_dir=(-0.9709754513490905, 0, 0.23917916480628057), z_dir=(-0.23917916480628057, 0, -0.9709754513490905))) as chamfer3_piece_1_section:
        Polygon((17.5, CHAMFER3_SIZE), (17.5 - CHAMFER3_SIZE, 0), (17.5, 0), align=None)
    chamfer3_piece_1 = revolve(axis=Axis((0, 18.46478, 0), (0, 1, 0)), revolution_arc=62.323801839, mode=Mode.PRIVATE)
    chamfer3_piece_1 = split(chamfer3_piece_1, bisect_by=Plane(origin=(-5.769991334, 18.46478, -5.769991334), z_dir=(0.7071067811865477, 0, 0.7071067811865474)), keep=Keep.TOP, mode=Mode.PRIVATE)
    chamfer3_piece_1 = split(chamfer3_piece_1, bisect_by=Plane(origin=(5.769991334, 18.46478, 5.769991334), z_dir=(-0.7071067811865477, 0, -0.7071067811865474)), keep=Keep.TOP, mode=Mode.PRIVATE)
    add(chamfer3_piece_1, mode=Mode.SUBTRACT)
    with BuildSketch(Plane(origin=(0, 18.46478, 0), x_dir=(0.9709754513490907, 0, -0.23917916480628015), z_dir=(0.23917916480628015, 0, 0.9709754513490907))) as chamfer3_piece_2_section:
        Polygon((17.5, CHAMFER3_SIZE), (17.5 - CHAMFER3_SIZE, 0), (17.5, 0), align=None)
    chamfer3_piece_2 = revolve(axis=Axis((0, 18.46478, 0), (0, 1, 0)), revolution_arc=62.323801838, mode=Mode.PRIVATE)
    chamfer3_piece_2 = split(chamfer3_piece_2, bisect_by=Plane(origin=(-5.769991334, 18.46478, -5.769991334), z_dir=(0.7071067811865477, 0, 0.7071067811865474)), keep=Keep.TOP, mode=Mode.PRIVATE)
    chamfer3_piece_2 = split(chamfer3_piece_2, bisect_by=Plane(origin=(5.769991334, 18.46478, 5.769991334), z_dir=(-0.7071067811865477, 0, -0.7071067811865474)), keep=Keep.TOP, mode=Mode.PRIVATE)
    add(chamfer3_piece_2, mode=Mode.SUBTRACT)
    with BuildSketch(Plane(origin=(-5.904179941, 13.46478, 17.44416261), x_dir=(0, 1, 0), z_dir=(0.7071067811865474, 0, -0.7071067811865477))) as chamfer3_piece_3:
        Polygon((CHAMFER3_SIZE, 0), (0, CHAMFER3_SIZE), (0, 0), align=None)
    extrude(amount=33.019542695, mode=Mode.SUBTRACT)
    with BuildSketch(Plane(origin=(-17.123388372, 13.46478, 5.583405703), x_dir=(0, 1, 0), z_dir=(0.7071067811865474, 0, -0.7071067811865477))) as chamfer3_piece_4:
        Polygon((CHAMFER3_SIZE, 0), (0, -CHAMFER3_SIZE), (0, 0), align=None)
    extrude(amount=32.112256139, mode=Mode.SUBTRACT)
    with BuildSketch(Plane(origin=(-5.176798149, 12.436106805, 16.716780818), x_dir=(0.9577067424018318, 0, 0.2877460608906247), z_dir=(0, 1, 0))) as chamfer3_piece_5:
        with BuildLine():
            Line((0.295333321, 0), (CHAMFER3_SIZE * 0.473733741025, CHAMFER3_SIZE * 0.880668122856))
            Line((CHAMFER3_SIZE * 0.473733741025, CHAMFER3_SIZE * 0.880668122856), (0, 0))
            ThreePointArc((0, 0), (0.149967703, -0.000622872), (0.295333321, 0))
        make_face()
    extrude(amount=6.028673195, mode=Mode.SUBTRACT)
    with BuildSketch(Plane(origin=(16.716780818, 12.447527829, -5.176798149), x_dir=(0.28500238302808506, 0, 0.9585268080071171), z_dir=(0, 1, 0))) as chamfer3_piece_6:
        with BuildLine():
            Line((0.395554872, 0), (CHAMFER3_SIZE_2 * 0.476253687411, -CHAMFER3_SIZE_2 * 0.879307922132))
            Line((CHAMFER3_SIZE_2 * 0.476253687411, -CHAMFER3_SIZE_2 * 0.879307922132), (0, 0))
            ThreePointArc((0, 0), (0.203368527, 0.00111674), (0.395554872, 0))
        make_face()
    extrude(amount=6.017252171, mode=Mode.SUBTRACT)
    with BuildSketch(Plane(origin=(5.176798149, 12.836106805, -16.716780818), x_dir=(-0.9577067424018358, 0, -0.28774606089061117), z_dir=(0, 1, 0))) as chamfer3_piece_7:
        with BuildLine():
            Line((0.295333321, 0), (CHAMFER3_SIZE * 0.473733741025, CHAMFER3_SIZE * 0.880668122856))
            Line((CHAMFER3_SIZE * 0.473733741025, CHAMFER3_SIZE * 0.880668122856), (0, 0))
            ThreePointArc((0, 0), (0.149967703, -0.000622872), (0.295333321, 0))
        make_face()
    extrude(amount=5.628673195, mode=Mode.SUBTRACT)
    with BuildSketch(Plane(origin=(-16.716780818, 12.847527829, 5.176798149), x_dir=(-0.2850023830280762, 0, -0.9585268080071198), z_dir=(0, 1, 0))) as chamfer3_piece_8:
        with BuildLine():
            Line((0.395554872, 0), (CHAMFER3_SIZE_2 * 0.476253687411, -CHAMFER3_SIZE_2 * 0.879307922132))
            Line((CHAMFER3_SIZE_2 * 0.476253687411, -CHAMFER3_SIZE_2 * 0.879307922132), (0, 0))
            ThreePointArc((0, 0), (0.203368527, 0.00111674), (0.395554872, 0))
        make_face()
    extrude(amount=5.617252171, mode=Mode.SUBTRACT)
    with BuildSketch(Plane(origin=(0, 18.46478, 0), x_dir=(-0.9709754513490905, 0, 0.23917916480628057), z_dir=(-0.23917916480628057, 0, -0.9709754513490905))) as chamfer3_piece_9a_section:
        Polygon((17.5, CHAMFER3_SIZE), (17.5 - CHAMFER3_SIZE, 0), (17.5, 0), align=None)
    chamfer3_piece_9a = revolve(axis=Axis((0, 18.46478, 0), (0, 1, 0)), revolution_arc=62.323801839, mode=Mode.PRIVATE)
    chamfer3_piece_9a = split(chamfer3_piece_9a, bisect_by=Plane(origin=(-5.769991334, 18.46478, -5.769991334), z_dir=(-0.7071067811865477, 0, -0.7071067811865474)), keep=Keep.TOP, mode=Mode.PRIVATE)
    with BuildSketch(Plane(origin=(-16.716780818, 12.847527829, 5.176798149), x_dir=(-0.2850023830280762, 0, -0.9585268080071198), z_dir=(0, 1, 0))) as chamfer3_piece_9b_section:
        with BuildLine():
            Line((0.395554872, 0), (CHAMFER3_SIZE_2 * 0.476253687411, -CHAMFER3_SIZE_2 * 0.879307922132))
            Line((CHAMFER3_SIZE_2 * 0.476253687411, -CHAMFER3_SIZE_2 * 0.879307922132), (0, 0))
            ThreePointArc((0, 0), (0.203368527, 0.00111674), (0.395554872, 0))
        make_face()
    chamfer3_piece_9b = extrude(amount=6.634504342, mode=Mode.PRIVATE)
    chamfer3_piece_9b = split(chamfer3_piece_9b, bisect_by=Plane(origin=(-16.716780818, 18.46478, 5.176798149), z_dir=(0, 1, 0)), keep=Keep.TOP, mode=Mode.PRIVATE)
    chamfer3_piece_9 = chamfer3_piece_9a & chamfer3_piece_9b
    add(chamfer3_piece_9, mode=Mode.SUBTRACT)
    with BuildSketch(Plane(origin=(0, 18.46478, 0), x_dir=(-0.9709754513490905, 0, 0.23917916480628057), z_dir=(-0.23917916480628057, 0, -0.9709754513490905))) as chamfer3_piece_10a_section:
        Polygon((17.5, CHAMFER3_SIZE), (17.5 - CHAMFER3_SIZE, 0), (17.5, 0), align=None)
    chamfer3_piece_10a = revolve(axis=Axis((0, 18.46478, 0), (0, 1, 0)), revolution_arc=62.323801839, mode=Mode.PRIVATE)
    chamfer3_piece_10a = split(chamfer3_piece_10a, bisect_by=Plane(origin=(5.769991334, 18.46478, 5.769991334), z_dir=(0.7071067811865477, 0, 0.7071067811865474)), keep=Keep.TOP, mode=Mode.PRIVATE)
    with BuildSketch(Plane(origin=(-5.176798149, 12.436106805, 16.716780818), x_dir=(0.9577067424018318, 0, 0.2877460608906247), z_dir=(0, 1, 0))) as chamfer3_piece_10b_section:
        with BuildLine():
            Line((0.295333321, 0), (CHAMFER3_SIZE * 0.473733741025, CHAMFER3_SIZE * 0.880668122856))
            Line((CHAMFER3_SIZE * 0.473733741025, CHAMFER3_SIZE * 0.880668122856), (0, 0))
            ThreePointArc((0, 0), (0.149967703, -0.000622872), (0.295333321, 0))
        make_face()
    chamfer3_piece_10b = extrude(amount=7.05734639, mode=Mode.PRIVATE)
    chamfer3_piece_10b = split(chamfer3_piece_10b, bisect_by=Plane(origin=(-5.176798149, 18.46478, 16.716780818), z_dir=(0, 1, 0)), keep=Keep.TOP, mode=Mode.PRIVATE)
    chamfer3_piece_10 = chamfer3_piece_10a & chamfer3_piece_10b
    add(chamfer3_piece_10, mode=Mode.SUBTRACT)
    with BuildSketch(Plane(origin=(0, 18.46478, 0), x_dir=(0.9709754513490907, 0, -0.23917916480628015), z_dir=(0.23917916480628015, 0, 0.9709754513490907))) as chamfer3_piece_11a_section:
        Polygon((17.5, CHAMFER3_SIZE), (17.5 - CHAMFER3_SIZE, 0), (17.5, 0), align=None)
    chamfer3_piece_11a = revolve(axis=Axis((0, 18.46478, 0), (0, 1, 0)), revolution_arc=62.323801838, mode=Mode.PRIVATE)
    chamfer3_piece_11a = split(chamfer3_piece_11a, bisect_by=Plane(origin=(5.769991334, 18.46478, 5.769991334), z_dir=(0.7071067811865477, 0, 0.7071067811865474)), keep=Keep.TOP, mode=Mode.PRIVATE)
    with BuildSketch(Plane(origin=(16.716780818, 12.447527829, -5.176798149), x_dir=(0.28500238302808506, 0, 0.9585268080071171), z_dir=(0, 1, 0))) as chamfer3_piece_11b_section:
        with BuildLine():
            Line((0.395554872, 0), (CHAMFER3_SIZE_2 * 0.476253687411, -CHAMFER3_SIZE_2 * 0.879307922132))
            Line((CHAMFER3_SIZE_2 * 0.476253687411, -CHAMFER3_SIZE_2 * 0.879307922132), (0, 0))
            ThreePointArc((0, 0), (0.203368527, 0.00111674), (0.395554872, 0))
        make_face()
    chamfer3_piece_11b = extrude(amount=7.034504342, mode=Mode.PRIVATE)
    chamfer3_piece_11b = split(chamfer3_piece_11b, bisect_by=Plane(origin=(16.716780818, 18.46478, -5.176798149), z_dir=(0, 1, 0)), keep=Keep.TOP, mode=Mode.PRIVATE)
    chamfer3_piece_11 = chamfer3_piece_11a & chamfer3_piece_11b
    add(chamfer3_piece_11, mode=Mode.SUBTRACT)
    with BuildSketch(Plane(origin=(0, 18.46478, 0), x_dir=(0.9709754513490907, 0, -0.23917916480628015), z_dir=(0.23917916480628015, 0, 0.9709754513490907))) as chamfer3_piece_12a_section:
        Polygon((17.5, CHAMFER3_SIZE), (17.5 - CHAMFER3_SIZE, 0), (17.5, 0), align=None)
    chamfer3_piece_12a = revolve(axis=Axis((0, 18.46478, 0), (0, 1, 0)), revolution_arc=62.323801838, mode=Mode.PRIVATE)
    chamfer3_piece_12a = split(chamfer3_piece_12a, bisect_by=Plane(origin=(-5.769991334, 18.46478, -5.769991334), z_dir=(-0.7071067811865477, 0, -0.7071067811865474)), keep=Keep.TOP, mode=Mode.PRIVATE)
    with BuildSketch(Plane(origin=(5.176798149, 12.836106805, -16.716780818), x_dir=(-0.9577067424018358, 0, -0.28774606089061117), z_dir=(0, 1, 0))) as chamfer3_piece_12b_section:
        with BuildLine():
            Line((0.295333321, 0), (CHAMFER3_SIZE * 0.473733741025, CHAMFER3_SIZE * 0.880668122856))
            Line((CHAMFER3_SIZE * 0.473733741025, CHAMFER3_SIZE * 0.880668122856), (0, 0))
            ThreePointArc((0, 0), (0.149967703, -0.000622872), (0.295333321, 0))
        make_face()
    chamfer3_piece_12b = extrude(amount=6.65734639, mode=Mode.PRIVATE)
    chamfer3_piece_12b = split(chamfer3_piece_12b, bisect_by=Plane(origin=(5.176798149, 18.46478, -16.716780818), z_dir=(0, 1, 0)), keep=Keep.TOP, mode=Mode.PRIVATE)
    chamfer3_piece_12 = chamfer3_piece_12a & chamfer3_piece_12b
    add(chamfer3_piece_12, mode=Mode.SUBTRACT)


solid = Compound([part.part, body_2.part, body_3_1.part])
